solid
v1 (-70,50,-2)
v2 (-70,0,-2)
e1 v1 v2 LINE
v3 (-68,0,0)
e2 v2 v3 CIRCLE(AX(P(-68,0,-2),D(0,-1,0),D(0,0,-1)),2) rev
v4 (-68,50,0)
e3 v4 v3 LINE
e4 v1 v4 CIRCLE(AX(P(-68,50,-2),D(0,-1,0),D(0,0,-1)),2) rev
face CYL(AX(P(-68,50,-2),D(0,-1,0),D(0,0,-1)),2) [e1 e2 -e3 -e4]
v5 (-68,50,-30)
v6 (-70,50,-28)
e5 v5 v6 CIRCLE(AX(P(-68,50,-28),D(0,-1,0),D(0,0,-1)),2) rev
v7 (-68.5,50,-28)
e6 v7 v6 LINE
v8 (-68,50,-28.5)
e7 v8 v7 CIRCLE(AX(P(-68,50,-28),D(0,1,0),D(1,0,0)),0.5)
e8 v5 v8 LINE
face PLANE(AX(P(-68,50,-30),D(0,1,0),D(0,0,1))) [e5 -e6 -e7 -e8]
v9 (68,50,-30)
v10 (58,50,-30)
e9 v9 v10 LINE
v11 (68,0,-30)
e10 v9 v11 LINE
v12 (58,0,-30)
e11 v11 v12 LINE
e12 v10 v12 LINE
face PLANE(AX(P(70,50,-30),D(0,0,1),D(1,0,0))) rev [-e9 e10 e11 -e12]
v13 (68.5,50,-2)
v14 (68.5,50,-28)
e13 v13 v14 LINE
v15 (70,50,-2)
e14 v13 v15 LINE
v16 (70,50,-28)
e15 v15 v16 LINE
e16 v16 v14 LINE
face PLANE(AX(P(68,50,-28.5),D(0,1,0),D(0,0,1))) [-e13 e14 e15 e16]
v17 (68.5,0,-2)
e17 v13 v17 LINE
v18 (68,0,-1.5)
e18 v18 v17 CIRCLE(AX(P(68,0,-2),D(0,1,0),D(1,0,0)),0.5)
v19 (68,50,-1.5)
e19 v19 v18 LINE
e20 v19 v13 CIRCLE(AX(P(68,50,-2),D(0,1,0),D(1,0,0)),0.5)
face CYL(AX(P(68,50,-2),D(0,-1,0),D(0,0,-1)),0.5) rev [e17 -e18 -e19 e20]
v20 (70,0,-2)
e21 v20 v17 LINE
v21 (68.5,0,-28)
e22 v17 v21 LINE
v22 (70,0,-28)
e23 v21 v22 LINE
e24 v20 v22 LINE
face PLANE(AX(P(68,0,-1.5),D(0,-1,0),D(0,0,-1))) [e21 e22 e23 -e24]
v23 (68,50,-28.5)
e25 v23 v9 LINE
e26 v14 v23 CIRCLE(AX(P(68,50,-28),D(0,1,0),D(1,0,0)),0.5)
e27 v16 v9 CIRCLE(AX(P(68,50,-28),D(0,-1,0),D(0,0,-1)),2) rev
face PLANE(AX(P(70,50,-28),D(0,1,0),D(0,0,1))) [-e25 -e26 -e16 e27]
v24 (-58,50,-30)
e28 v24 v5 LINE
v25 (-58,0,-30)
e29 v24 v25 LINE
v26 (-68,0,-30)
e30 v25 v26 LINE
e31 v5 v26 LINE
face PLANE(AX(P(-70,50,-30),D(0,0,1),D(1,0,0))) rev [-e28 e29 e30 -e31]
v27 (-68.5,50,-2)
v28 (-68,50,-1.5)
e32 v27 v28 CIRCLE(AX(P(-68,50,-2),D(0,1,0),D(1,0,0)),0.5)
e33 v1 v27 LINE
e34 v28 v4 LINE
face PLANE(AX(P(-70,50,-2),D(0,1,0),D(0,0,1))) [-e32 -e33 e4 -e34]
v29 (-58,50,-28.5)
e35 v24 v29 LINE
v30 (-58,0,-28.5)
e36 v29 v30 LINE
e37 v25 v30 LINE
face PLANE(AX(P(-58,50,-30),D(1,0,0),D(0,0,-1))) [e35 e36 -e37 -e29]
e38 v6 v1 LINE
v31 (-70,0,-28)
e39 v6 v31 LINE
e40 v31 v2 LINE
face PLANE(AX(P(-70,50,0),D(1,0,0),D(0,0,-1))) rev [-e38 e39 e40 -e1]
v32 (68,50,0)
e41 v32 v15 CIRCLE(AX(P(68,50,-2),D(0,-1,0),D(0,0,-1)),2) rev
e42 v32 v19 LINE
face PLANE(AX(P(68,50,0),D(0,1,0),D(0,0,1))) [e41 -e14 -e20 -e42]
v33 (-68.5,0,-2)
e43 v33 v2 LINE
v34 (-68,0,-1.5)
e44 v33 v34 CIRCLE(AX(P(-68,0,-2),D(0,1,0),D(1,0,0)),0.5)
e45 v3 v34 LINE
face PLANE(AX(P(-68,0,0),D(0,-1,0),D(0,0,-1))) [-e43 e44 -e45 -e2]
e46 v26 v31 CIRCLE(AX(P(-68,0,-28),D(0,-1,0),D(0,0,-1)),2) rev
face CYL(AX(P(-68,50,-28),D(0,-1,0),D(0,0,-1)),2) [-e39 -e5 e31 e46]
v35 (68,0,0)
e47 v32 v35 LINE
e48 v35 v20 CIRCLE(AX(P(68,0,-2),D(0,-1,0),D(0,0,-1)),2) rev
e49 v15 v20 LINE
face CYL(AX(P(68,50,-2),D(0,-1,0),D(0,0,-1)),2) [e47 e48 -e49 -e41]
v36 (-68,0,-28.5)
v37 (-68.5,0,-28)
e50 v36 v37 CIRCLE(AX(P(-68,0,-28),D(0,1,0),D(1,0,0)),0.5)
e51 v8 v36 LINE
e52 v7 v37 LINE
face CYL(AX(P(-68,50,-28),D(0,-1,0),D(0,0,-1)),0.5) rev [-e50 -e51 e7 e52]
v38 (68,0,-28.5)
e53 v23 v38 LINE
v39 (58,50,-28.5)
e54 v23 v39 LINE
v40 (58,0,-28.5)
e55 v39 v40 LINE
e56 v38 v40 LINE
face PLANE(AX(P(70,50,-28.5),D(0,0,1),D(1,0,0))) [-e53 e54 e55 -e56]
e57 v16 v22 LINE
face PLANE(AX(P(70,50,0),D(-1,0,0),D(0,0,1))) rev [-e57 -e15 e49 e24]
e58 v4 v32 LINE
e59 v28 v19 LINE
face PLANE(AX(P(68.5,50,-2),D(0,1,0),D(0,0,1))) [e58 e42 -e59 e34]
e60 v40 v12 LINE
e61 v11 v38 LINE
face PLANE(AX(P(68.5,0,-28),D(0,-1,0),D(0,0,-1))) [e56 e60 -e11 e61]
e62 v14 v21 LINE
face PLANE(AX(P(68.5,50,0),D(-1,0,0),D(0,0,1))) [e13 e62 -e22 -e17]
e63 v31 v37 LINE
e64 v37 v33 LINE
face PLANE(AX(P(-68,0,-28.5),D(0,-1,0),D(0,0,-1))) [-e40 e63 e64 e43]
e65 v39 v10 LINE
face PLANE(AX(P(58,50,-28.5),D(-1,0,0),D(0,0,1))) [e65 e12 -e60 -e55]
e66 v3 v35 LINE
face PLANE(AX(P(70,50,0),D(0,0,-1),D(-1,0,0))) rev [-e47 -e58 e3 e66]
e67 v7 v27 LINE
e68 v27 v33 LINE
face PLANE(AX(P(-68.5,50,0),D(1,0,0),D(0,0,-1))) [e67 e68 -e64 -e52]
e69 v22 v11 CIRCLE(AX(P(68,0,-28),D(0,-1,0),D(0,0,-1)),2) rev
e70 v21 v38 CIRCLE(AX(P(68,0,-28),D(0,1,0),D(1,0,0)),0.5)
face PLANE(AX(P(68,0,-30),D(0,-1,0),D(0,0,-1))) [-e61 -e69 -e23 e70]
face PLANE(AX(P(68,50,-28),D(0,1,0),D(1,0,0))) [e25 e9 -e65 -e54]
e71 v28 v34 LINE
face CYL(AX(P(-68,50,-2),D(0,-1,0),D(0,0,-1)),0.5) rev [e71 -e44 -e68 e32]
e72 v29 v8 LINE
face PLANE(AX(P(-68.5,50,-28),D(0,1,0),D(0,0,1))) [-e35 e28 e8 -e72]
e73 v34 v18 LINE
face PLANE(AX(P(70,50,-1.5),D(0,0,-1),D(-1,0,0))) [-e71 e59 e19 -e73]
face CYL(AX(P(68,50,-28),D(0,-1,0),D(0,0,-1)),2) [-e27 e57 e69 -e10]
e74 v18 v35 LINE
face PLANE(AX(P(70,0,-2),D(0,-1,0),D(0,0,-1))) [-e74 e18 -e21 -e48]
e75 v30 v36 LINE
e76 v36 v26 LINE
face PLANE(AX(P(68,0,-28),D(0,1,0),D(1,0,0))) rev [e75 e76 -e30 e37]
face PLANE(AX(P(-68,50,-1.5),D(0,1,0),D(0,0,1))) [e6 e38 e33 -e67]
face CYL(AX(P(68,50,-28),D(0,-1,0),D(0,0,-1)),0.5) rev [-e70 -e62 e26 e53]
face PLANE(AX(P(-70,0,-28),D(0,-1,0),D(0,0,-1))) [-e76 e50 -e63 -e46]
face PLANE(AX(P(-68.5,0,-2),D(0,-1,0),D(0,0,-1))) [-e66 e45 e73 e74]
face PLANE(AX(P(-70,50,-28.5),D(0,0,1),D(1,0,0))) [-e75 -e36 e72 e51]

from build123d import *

# Parameters (mm, degrees)
BASE_FLANGE1_DEPTH = 50


# Sheet-metal steps are written as plain solids
with BuildPart() as part:
    # Sketch1 → Base-Flange1 (new body)
    with BuildSketch(Plane(origin=(0, 0, 0), x_dir=(1, 0, 0), z_dir=(0, 1, 0))):
        with BuildLine():
            Line((58, 30), (68, 30))
            ThreePointArc((68, 30), (69.414213562, 29.414213562), (70, 28))
            Line((70, 28), (70, 2))
            ThreePointArc((70, 2), (69.414213562, 0.585786438), (68, 0))
            Line((68, 0), (-68, 0))
            ThreePointArc((-68, 0), (-69.414213562, 0.585786438), (-70, 2))
            Line((-70, 2), (-70, 28))
            ThreePointArc((-70, 28), (-69.414213562, 29.414213562), (-68, 30))
            Line((-68, 30), (-58, 30))
            Line((-58, 30), (-58, 28.5))
            Line((-58, 28.5), (-68, 28.5))
            ThreePointArc((-68, 28.5), (-68.353553391, 28.353553391), (-68.5, 28))
            Line((-68.5, 28), (-68.5, 2))
            ThreePointArc((-68.5, 2), (-68.353553391, 1.646446609), (-68, 1.5))
            Line((-68, 1.5), (68, 1.5))
            ThreePointArc((68, 1.5), (68.353553391, 1.646446609), (68.5, 2))
            Line((68.5, 2), (68.5, 28))
            ThreePointArc((68.5, 28), (68.353553391, 28.353553391), (68, 28.5))
            Line((68, 28.5), (58, 28.5))
            Line((58, 28.5), (58, 30))
        make_face()
    extrude(amount=BASE_FLANGE1_DEPTH)


solid = part.part
